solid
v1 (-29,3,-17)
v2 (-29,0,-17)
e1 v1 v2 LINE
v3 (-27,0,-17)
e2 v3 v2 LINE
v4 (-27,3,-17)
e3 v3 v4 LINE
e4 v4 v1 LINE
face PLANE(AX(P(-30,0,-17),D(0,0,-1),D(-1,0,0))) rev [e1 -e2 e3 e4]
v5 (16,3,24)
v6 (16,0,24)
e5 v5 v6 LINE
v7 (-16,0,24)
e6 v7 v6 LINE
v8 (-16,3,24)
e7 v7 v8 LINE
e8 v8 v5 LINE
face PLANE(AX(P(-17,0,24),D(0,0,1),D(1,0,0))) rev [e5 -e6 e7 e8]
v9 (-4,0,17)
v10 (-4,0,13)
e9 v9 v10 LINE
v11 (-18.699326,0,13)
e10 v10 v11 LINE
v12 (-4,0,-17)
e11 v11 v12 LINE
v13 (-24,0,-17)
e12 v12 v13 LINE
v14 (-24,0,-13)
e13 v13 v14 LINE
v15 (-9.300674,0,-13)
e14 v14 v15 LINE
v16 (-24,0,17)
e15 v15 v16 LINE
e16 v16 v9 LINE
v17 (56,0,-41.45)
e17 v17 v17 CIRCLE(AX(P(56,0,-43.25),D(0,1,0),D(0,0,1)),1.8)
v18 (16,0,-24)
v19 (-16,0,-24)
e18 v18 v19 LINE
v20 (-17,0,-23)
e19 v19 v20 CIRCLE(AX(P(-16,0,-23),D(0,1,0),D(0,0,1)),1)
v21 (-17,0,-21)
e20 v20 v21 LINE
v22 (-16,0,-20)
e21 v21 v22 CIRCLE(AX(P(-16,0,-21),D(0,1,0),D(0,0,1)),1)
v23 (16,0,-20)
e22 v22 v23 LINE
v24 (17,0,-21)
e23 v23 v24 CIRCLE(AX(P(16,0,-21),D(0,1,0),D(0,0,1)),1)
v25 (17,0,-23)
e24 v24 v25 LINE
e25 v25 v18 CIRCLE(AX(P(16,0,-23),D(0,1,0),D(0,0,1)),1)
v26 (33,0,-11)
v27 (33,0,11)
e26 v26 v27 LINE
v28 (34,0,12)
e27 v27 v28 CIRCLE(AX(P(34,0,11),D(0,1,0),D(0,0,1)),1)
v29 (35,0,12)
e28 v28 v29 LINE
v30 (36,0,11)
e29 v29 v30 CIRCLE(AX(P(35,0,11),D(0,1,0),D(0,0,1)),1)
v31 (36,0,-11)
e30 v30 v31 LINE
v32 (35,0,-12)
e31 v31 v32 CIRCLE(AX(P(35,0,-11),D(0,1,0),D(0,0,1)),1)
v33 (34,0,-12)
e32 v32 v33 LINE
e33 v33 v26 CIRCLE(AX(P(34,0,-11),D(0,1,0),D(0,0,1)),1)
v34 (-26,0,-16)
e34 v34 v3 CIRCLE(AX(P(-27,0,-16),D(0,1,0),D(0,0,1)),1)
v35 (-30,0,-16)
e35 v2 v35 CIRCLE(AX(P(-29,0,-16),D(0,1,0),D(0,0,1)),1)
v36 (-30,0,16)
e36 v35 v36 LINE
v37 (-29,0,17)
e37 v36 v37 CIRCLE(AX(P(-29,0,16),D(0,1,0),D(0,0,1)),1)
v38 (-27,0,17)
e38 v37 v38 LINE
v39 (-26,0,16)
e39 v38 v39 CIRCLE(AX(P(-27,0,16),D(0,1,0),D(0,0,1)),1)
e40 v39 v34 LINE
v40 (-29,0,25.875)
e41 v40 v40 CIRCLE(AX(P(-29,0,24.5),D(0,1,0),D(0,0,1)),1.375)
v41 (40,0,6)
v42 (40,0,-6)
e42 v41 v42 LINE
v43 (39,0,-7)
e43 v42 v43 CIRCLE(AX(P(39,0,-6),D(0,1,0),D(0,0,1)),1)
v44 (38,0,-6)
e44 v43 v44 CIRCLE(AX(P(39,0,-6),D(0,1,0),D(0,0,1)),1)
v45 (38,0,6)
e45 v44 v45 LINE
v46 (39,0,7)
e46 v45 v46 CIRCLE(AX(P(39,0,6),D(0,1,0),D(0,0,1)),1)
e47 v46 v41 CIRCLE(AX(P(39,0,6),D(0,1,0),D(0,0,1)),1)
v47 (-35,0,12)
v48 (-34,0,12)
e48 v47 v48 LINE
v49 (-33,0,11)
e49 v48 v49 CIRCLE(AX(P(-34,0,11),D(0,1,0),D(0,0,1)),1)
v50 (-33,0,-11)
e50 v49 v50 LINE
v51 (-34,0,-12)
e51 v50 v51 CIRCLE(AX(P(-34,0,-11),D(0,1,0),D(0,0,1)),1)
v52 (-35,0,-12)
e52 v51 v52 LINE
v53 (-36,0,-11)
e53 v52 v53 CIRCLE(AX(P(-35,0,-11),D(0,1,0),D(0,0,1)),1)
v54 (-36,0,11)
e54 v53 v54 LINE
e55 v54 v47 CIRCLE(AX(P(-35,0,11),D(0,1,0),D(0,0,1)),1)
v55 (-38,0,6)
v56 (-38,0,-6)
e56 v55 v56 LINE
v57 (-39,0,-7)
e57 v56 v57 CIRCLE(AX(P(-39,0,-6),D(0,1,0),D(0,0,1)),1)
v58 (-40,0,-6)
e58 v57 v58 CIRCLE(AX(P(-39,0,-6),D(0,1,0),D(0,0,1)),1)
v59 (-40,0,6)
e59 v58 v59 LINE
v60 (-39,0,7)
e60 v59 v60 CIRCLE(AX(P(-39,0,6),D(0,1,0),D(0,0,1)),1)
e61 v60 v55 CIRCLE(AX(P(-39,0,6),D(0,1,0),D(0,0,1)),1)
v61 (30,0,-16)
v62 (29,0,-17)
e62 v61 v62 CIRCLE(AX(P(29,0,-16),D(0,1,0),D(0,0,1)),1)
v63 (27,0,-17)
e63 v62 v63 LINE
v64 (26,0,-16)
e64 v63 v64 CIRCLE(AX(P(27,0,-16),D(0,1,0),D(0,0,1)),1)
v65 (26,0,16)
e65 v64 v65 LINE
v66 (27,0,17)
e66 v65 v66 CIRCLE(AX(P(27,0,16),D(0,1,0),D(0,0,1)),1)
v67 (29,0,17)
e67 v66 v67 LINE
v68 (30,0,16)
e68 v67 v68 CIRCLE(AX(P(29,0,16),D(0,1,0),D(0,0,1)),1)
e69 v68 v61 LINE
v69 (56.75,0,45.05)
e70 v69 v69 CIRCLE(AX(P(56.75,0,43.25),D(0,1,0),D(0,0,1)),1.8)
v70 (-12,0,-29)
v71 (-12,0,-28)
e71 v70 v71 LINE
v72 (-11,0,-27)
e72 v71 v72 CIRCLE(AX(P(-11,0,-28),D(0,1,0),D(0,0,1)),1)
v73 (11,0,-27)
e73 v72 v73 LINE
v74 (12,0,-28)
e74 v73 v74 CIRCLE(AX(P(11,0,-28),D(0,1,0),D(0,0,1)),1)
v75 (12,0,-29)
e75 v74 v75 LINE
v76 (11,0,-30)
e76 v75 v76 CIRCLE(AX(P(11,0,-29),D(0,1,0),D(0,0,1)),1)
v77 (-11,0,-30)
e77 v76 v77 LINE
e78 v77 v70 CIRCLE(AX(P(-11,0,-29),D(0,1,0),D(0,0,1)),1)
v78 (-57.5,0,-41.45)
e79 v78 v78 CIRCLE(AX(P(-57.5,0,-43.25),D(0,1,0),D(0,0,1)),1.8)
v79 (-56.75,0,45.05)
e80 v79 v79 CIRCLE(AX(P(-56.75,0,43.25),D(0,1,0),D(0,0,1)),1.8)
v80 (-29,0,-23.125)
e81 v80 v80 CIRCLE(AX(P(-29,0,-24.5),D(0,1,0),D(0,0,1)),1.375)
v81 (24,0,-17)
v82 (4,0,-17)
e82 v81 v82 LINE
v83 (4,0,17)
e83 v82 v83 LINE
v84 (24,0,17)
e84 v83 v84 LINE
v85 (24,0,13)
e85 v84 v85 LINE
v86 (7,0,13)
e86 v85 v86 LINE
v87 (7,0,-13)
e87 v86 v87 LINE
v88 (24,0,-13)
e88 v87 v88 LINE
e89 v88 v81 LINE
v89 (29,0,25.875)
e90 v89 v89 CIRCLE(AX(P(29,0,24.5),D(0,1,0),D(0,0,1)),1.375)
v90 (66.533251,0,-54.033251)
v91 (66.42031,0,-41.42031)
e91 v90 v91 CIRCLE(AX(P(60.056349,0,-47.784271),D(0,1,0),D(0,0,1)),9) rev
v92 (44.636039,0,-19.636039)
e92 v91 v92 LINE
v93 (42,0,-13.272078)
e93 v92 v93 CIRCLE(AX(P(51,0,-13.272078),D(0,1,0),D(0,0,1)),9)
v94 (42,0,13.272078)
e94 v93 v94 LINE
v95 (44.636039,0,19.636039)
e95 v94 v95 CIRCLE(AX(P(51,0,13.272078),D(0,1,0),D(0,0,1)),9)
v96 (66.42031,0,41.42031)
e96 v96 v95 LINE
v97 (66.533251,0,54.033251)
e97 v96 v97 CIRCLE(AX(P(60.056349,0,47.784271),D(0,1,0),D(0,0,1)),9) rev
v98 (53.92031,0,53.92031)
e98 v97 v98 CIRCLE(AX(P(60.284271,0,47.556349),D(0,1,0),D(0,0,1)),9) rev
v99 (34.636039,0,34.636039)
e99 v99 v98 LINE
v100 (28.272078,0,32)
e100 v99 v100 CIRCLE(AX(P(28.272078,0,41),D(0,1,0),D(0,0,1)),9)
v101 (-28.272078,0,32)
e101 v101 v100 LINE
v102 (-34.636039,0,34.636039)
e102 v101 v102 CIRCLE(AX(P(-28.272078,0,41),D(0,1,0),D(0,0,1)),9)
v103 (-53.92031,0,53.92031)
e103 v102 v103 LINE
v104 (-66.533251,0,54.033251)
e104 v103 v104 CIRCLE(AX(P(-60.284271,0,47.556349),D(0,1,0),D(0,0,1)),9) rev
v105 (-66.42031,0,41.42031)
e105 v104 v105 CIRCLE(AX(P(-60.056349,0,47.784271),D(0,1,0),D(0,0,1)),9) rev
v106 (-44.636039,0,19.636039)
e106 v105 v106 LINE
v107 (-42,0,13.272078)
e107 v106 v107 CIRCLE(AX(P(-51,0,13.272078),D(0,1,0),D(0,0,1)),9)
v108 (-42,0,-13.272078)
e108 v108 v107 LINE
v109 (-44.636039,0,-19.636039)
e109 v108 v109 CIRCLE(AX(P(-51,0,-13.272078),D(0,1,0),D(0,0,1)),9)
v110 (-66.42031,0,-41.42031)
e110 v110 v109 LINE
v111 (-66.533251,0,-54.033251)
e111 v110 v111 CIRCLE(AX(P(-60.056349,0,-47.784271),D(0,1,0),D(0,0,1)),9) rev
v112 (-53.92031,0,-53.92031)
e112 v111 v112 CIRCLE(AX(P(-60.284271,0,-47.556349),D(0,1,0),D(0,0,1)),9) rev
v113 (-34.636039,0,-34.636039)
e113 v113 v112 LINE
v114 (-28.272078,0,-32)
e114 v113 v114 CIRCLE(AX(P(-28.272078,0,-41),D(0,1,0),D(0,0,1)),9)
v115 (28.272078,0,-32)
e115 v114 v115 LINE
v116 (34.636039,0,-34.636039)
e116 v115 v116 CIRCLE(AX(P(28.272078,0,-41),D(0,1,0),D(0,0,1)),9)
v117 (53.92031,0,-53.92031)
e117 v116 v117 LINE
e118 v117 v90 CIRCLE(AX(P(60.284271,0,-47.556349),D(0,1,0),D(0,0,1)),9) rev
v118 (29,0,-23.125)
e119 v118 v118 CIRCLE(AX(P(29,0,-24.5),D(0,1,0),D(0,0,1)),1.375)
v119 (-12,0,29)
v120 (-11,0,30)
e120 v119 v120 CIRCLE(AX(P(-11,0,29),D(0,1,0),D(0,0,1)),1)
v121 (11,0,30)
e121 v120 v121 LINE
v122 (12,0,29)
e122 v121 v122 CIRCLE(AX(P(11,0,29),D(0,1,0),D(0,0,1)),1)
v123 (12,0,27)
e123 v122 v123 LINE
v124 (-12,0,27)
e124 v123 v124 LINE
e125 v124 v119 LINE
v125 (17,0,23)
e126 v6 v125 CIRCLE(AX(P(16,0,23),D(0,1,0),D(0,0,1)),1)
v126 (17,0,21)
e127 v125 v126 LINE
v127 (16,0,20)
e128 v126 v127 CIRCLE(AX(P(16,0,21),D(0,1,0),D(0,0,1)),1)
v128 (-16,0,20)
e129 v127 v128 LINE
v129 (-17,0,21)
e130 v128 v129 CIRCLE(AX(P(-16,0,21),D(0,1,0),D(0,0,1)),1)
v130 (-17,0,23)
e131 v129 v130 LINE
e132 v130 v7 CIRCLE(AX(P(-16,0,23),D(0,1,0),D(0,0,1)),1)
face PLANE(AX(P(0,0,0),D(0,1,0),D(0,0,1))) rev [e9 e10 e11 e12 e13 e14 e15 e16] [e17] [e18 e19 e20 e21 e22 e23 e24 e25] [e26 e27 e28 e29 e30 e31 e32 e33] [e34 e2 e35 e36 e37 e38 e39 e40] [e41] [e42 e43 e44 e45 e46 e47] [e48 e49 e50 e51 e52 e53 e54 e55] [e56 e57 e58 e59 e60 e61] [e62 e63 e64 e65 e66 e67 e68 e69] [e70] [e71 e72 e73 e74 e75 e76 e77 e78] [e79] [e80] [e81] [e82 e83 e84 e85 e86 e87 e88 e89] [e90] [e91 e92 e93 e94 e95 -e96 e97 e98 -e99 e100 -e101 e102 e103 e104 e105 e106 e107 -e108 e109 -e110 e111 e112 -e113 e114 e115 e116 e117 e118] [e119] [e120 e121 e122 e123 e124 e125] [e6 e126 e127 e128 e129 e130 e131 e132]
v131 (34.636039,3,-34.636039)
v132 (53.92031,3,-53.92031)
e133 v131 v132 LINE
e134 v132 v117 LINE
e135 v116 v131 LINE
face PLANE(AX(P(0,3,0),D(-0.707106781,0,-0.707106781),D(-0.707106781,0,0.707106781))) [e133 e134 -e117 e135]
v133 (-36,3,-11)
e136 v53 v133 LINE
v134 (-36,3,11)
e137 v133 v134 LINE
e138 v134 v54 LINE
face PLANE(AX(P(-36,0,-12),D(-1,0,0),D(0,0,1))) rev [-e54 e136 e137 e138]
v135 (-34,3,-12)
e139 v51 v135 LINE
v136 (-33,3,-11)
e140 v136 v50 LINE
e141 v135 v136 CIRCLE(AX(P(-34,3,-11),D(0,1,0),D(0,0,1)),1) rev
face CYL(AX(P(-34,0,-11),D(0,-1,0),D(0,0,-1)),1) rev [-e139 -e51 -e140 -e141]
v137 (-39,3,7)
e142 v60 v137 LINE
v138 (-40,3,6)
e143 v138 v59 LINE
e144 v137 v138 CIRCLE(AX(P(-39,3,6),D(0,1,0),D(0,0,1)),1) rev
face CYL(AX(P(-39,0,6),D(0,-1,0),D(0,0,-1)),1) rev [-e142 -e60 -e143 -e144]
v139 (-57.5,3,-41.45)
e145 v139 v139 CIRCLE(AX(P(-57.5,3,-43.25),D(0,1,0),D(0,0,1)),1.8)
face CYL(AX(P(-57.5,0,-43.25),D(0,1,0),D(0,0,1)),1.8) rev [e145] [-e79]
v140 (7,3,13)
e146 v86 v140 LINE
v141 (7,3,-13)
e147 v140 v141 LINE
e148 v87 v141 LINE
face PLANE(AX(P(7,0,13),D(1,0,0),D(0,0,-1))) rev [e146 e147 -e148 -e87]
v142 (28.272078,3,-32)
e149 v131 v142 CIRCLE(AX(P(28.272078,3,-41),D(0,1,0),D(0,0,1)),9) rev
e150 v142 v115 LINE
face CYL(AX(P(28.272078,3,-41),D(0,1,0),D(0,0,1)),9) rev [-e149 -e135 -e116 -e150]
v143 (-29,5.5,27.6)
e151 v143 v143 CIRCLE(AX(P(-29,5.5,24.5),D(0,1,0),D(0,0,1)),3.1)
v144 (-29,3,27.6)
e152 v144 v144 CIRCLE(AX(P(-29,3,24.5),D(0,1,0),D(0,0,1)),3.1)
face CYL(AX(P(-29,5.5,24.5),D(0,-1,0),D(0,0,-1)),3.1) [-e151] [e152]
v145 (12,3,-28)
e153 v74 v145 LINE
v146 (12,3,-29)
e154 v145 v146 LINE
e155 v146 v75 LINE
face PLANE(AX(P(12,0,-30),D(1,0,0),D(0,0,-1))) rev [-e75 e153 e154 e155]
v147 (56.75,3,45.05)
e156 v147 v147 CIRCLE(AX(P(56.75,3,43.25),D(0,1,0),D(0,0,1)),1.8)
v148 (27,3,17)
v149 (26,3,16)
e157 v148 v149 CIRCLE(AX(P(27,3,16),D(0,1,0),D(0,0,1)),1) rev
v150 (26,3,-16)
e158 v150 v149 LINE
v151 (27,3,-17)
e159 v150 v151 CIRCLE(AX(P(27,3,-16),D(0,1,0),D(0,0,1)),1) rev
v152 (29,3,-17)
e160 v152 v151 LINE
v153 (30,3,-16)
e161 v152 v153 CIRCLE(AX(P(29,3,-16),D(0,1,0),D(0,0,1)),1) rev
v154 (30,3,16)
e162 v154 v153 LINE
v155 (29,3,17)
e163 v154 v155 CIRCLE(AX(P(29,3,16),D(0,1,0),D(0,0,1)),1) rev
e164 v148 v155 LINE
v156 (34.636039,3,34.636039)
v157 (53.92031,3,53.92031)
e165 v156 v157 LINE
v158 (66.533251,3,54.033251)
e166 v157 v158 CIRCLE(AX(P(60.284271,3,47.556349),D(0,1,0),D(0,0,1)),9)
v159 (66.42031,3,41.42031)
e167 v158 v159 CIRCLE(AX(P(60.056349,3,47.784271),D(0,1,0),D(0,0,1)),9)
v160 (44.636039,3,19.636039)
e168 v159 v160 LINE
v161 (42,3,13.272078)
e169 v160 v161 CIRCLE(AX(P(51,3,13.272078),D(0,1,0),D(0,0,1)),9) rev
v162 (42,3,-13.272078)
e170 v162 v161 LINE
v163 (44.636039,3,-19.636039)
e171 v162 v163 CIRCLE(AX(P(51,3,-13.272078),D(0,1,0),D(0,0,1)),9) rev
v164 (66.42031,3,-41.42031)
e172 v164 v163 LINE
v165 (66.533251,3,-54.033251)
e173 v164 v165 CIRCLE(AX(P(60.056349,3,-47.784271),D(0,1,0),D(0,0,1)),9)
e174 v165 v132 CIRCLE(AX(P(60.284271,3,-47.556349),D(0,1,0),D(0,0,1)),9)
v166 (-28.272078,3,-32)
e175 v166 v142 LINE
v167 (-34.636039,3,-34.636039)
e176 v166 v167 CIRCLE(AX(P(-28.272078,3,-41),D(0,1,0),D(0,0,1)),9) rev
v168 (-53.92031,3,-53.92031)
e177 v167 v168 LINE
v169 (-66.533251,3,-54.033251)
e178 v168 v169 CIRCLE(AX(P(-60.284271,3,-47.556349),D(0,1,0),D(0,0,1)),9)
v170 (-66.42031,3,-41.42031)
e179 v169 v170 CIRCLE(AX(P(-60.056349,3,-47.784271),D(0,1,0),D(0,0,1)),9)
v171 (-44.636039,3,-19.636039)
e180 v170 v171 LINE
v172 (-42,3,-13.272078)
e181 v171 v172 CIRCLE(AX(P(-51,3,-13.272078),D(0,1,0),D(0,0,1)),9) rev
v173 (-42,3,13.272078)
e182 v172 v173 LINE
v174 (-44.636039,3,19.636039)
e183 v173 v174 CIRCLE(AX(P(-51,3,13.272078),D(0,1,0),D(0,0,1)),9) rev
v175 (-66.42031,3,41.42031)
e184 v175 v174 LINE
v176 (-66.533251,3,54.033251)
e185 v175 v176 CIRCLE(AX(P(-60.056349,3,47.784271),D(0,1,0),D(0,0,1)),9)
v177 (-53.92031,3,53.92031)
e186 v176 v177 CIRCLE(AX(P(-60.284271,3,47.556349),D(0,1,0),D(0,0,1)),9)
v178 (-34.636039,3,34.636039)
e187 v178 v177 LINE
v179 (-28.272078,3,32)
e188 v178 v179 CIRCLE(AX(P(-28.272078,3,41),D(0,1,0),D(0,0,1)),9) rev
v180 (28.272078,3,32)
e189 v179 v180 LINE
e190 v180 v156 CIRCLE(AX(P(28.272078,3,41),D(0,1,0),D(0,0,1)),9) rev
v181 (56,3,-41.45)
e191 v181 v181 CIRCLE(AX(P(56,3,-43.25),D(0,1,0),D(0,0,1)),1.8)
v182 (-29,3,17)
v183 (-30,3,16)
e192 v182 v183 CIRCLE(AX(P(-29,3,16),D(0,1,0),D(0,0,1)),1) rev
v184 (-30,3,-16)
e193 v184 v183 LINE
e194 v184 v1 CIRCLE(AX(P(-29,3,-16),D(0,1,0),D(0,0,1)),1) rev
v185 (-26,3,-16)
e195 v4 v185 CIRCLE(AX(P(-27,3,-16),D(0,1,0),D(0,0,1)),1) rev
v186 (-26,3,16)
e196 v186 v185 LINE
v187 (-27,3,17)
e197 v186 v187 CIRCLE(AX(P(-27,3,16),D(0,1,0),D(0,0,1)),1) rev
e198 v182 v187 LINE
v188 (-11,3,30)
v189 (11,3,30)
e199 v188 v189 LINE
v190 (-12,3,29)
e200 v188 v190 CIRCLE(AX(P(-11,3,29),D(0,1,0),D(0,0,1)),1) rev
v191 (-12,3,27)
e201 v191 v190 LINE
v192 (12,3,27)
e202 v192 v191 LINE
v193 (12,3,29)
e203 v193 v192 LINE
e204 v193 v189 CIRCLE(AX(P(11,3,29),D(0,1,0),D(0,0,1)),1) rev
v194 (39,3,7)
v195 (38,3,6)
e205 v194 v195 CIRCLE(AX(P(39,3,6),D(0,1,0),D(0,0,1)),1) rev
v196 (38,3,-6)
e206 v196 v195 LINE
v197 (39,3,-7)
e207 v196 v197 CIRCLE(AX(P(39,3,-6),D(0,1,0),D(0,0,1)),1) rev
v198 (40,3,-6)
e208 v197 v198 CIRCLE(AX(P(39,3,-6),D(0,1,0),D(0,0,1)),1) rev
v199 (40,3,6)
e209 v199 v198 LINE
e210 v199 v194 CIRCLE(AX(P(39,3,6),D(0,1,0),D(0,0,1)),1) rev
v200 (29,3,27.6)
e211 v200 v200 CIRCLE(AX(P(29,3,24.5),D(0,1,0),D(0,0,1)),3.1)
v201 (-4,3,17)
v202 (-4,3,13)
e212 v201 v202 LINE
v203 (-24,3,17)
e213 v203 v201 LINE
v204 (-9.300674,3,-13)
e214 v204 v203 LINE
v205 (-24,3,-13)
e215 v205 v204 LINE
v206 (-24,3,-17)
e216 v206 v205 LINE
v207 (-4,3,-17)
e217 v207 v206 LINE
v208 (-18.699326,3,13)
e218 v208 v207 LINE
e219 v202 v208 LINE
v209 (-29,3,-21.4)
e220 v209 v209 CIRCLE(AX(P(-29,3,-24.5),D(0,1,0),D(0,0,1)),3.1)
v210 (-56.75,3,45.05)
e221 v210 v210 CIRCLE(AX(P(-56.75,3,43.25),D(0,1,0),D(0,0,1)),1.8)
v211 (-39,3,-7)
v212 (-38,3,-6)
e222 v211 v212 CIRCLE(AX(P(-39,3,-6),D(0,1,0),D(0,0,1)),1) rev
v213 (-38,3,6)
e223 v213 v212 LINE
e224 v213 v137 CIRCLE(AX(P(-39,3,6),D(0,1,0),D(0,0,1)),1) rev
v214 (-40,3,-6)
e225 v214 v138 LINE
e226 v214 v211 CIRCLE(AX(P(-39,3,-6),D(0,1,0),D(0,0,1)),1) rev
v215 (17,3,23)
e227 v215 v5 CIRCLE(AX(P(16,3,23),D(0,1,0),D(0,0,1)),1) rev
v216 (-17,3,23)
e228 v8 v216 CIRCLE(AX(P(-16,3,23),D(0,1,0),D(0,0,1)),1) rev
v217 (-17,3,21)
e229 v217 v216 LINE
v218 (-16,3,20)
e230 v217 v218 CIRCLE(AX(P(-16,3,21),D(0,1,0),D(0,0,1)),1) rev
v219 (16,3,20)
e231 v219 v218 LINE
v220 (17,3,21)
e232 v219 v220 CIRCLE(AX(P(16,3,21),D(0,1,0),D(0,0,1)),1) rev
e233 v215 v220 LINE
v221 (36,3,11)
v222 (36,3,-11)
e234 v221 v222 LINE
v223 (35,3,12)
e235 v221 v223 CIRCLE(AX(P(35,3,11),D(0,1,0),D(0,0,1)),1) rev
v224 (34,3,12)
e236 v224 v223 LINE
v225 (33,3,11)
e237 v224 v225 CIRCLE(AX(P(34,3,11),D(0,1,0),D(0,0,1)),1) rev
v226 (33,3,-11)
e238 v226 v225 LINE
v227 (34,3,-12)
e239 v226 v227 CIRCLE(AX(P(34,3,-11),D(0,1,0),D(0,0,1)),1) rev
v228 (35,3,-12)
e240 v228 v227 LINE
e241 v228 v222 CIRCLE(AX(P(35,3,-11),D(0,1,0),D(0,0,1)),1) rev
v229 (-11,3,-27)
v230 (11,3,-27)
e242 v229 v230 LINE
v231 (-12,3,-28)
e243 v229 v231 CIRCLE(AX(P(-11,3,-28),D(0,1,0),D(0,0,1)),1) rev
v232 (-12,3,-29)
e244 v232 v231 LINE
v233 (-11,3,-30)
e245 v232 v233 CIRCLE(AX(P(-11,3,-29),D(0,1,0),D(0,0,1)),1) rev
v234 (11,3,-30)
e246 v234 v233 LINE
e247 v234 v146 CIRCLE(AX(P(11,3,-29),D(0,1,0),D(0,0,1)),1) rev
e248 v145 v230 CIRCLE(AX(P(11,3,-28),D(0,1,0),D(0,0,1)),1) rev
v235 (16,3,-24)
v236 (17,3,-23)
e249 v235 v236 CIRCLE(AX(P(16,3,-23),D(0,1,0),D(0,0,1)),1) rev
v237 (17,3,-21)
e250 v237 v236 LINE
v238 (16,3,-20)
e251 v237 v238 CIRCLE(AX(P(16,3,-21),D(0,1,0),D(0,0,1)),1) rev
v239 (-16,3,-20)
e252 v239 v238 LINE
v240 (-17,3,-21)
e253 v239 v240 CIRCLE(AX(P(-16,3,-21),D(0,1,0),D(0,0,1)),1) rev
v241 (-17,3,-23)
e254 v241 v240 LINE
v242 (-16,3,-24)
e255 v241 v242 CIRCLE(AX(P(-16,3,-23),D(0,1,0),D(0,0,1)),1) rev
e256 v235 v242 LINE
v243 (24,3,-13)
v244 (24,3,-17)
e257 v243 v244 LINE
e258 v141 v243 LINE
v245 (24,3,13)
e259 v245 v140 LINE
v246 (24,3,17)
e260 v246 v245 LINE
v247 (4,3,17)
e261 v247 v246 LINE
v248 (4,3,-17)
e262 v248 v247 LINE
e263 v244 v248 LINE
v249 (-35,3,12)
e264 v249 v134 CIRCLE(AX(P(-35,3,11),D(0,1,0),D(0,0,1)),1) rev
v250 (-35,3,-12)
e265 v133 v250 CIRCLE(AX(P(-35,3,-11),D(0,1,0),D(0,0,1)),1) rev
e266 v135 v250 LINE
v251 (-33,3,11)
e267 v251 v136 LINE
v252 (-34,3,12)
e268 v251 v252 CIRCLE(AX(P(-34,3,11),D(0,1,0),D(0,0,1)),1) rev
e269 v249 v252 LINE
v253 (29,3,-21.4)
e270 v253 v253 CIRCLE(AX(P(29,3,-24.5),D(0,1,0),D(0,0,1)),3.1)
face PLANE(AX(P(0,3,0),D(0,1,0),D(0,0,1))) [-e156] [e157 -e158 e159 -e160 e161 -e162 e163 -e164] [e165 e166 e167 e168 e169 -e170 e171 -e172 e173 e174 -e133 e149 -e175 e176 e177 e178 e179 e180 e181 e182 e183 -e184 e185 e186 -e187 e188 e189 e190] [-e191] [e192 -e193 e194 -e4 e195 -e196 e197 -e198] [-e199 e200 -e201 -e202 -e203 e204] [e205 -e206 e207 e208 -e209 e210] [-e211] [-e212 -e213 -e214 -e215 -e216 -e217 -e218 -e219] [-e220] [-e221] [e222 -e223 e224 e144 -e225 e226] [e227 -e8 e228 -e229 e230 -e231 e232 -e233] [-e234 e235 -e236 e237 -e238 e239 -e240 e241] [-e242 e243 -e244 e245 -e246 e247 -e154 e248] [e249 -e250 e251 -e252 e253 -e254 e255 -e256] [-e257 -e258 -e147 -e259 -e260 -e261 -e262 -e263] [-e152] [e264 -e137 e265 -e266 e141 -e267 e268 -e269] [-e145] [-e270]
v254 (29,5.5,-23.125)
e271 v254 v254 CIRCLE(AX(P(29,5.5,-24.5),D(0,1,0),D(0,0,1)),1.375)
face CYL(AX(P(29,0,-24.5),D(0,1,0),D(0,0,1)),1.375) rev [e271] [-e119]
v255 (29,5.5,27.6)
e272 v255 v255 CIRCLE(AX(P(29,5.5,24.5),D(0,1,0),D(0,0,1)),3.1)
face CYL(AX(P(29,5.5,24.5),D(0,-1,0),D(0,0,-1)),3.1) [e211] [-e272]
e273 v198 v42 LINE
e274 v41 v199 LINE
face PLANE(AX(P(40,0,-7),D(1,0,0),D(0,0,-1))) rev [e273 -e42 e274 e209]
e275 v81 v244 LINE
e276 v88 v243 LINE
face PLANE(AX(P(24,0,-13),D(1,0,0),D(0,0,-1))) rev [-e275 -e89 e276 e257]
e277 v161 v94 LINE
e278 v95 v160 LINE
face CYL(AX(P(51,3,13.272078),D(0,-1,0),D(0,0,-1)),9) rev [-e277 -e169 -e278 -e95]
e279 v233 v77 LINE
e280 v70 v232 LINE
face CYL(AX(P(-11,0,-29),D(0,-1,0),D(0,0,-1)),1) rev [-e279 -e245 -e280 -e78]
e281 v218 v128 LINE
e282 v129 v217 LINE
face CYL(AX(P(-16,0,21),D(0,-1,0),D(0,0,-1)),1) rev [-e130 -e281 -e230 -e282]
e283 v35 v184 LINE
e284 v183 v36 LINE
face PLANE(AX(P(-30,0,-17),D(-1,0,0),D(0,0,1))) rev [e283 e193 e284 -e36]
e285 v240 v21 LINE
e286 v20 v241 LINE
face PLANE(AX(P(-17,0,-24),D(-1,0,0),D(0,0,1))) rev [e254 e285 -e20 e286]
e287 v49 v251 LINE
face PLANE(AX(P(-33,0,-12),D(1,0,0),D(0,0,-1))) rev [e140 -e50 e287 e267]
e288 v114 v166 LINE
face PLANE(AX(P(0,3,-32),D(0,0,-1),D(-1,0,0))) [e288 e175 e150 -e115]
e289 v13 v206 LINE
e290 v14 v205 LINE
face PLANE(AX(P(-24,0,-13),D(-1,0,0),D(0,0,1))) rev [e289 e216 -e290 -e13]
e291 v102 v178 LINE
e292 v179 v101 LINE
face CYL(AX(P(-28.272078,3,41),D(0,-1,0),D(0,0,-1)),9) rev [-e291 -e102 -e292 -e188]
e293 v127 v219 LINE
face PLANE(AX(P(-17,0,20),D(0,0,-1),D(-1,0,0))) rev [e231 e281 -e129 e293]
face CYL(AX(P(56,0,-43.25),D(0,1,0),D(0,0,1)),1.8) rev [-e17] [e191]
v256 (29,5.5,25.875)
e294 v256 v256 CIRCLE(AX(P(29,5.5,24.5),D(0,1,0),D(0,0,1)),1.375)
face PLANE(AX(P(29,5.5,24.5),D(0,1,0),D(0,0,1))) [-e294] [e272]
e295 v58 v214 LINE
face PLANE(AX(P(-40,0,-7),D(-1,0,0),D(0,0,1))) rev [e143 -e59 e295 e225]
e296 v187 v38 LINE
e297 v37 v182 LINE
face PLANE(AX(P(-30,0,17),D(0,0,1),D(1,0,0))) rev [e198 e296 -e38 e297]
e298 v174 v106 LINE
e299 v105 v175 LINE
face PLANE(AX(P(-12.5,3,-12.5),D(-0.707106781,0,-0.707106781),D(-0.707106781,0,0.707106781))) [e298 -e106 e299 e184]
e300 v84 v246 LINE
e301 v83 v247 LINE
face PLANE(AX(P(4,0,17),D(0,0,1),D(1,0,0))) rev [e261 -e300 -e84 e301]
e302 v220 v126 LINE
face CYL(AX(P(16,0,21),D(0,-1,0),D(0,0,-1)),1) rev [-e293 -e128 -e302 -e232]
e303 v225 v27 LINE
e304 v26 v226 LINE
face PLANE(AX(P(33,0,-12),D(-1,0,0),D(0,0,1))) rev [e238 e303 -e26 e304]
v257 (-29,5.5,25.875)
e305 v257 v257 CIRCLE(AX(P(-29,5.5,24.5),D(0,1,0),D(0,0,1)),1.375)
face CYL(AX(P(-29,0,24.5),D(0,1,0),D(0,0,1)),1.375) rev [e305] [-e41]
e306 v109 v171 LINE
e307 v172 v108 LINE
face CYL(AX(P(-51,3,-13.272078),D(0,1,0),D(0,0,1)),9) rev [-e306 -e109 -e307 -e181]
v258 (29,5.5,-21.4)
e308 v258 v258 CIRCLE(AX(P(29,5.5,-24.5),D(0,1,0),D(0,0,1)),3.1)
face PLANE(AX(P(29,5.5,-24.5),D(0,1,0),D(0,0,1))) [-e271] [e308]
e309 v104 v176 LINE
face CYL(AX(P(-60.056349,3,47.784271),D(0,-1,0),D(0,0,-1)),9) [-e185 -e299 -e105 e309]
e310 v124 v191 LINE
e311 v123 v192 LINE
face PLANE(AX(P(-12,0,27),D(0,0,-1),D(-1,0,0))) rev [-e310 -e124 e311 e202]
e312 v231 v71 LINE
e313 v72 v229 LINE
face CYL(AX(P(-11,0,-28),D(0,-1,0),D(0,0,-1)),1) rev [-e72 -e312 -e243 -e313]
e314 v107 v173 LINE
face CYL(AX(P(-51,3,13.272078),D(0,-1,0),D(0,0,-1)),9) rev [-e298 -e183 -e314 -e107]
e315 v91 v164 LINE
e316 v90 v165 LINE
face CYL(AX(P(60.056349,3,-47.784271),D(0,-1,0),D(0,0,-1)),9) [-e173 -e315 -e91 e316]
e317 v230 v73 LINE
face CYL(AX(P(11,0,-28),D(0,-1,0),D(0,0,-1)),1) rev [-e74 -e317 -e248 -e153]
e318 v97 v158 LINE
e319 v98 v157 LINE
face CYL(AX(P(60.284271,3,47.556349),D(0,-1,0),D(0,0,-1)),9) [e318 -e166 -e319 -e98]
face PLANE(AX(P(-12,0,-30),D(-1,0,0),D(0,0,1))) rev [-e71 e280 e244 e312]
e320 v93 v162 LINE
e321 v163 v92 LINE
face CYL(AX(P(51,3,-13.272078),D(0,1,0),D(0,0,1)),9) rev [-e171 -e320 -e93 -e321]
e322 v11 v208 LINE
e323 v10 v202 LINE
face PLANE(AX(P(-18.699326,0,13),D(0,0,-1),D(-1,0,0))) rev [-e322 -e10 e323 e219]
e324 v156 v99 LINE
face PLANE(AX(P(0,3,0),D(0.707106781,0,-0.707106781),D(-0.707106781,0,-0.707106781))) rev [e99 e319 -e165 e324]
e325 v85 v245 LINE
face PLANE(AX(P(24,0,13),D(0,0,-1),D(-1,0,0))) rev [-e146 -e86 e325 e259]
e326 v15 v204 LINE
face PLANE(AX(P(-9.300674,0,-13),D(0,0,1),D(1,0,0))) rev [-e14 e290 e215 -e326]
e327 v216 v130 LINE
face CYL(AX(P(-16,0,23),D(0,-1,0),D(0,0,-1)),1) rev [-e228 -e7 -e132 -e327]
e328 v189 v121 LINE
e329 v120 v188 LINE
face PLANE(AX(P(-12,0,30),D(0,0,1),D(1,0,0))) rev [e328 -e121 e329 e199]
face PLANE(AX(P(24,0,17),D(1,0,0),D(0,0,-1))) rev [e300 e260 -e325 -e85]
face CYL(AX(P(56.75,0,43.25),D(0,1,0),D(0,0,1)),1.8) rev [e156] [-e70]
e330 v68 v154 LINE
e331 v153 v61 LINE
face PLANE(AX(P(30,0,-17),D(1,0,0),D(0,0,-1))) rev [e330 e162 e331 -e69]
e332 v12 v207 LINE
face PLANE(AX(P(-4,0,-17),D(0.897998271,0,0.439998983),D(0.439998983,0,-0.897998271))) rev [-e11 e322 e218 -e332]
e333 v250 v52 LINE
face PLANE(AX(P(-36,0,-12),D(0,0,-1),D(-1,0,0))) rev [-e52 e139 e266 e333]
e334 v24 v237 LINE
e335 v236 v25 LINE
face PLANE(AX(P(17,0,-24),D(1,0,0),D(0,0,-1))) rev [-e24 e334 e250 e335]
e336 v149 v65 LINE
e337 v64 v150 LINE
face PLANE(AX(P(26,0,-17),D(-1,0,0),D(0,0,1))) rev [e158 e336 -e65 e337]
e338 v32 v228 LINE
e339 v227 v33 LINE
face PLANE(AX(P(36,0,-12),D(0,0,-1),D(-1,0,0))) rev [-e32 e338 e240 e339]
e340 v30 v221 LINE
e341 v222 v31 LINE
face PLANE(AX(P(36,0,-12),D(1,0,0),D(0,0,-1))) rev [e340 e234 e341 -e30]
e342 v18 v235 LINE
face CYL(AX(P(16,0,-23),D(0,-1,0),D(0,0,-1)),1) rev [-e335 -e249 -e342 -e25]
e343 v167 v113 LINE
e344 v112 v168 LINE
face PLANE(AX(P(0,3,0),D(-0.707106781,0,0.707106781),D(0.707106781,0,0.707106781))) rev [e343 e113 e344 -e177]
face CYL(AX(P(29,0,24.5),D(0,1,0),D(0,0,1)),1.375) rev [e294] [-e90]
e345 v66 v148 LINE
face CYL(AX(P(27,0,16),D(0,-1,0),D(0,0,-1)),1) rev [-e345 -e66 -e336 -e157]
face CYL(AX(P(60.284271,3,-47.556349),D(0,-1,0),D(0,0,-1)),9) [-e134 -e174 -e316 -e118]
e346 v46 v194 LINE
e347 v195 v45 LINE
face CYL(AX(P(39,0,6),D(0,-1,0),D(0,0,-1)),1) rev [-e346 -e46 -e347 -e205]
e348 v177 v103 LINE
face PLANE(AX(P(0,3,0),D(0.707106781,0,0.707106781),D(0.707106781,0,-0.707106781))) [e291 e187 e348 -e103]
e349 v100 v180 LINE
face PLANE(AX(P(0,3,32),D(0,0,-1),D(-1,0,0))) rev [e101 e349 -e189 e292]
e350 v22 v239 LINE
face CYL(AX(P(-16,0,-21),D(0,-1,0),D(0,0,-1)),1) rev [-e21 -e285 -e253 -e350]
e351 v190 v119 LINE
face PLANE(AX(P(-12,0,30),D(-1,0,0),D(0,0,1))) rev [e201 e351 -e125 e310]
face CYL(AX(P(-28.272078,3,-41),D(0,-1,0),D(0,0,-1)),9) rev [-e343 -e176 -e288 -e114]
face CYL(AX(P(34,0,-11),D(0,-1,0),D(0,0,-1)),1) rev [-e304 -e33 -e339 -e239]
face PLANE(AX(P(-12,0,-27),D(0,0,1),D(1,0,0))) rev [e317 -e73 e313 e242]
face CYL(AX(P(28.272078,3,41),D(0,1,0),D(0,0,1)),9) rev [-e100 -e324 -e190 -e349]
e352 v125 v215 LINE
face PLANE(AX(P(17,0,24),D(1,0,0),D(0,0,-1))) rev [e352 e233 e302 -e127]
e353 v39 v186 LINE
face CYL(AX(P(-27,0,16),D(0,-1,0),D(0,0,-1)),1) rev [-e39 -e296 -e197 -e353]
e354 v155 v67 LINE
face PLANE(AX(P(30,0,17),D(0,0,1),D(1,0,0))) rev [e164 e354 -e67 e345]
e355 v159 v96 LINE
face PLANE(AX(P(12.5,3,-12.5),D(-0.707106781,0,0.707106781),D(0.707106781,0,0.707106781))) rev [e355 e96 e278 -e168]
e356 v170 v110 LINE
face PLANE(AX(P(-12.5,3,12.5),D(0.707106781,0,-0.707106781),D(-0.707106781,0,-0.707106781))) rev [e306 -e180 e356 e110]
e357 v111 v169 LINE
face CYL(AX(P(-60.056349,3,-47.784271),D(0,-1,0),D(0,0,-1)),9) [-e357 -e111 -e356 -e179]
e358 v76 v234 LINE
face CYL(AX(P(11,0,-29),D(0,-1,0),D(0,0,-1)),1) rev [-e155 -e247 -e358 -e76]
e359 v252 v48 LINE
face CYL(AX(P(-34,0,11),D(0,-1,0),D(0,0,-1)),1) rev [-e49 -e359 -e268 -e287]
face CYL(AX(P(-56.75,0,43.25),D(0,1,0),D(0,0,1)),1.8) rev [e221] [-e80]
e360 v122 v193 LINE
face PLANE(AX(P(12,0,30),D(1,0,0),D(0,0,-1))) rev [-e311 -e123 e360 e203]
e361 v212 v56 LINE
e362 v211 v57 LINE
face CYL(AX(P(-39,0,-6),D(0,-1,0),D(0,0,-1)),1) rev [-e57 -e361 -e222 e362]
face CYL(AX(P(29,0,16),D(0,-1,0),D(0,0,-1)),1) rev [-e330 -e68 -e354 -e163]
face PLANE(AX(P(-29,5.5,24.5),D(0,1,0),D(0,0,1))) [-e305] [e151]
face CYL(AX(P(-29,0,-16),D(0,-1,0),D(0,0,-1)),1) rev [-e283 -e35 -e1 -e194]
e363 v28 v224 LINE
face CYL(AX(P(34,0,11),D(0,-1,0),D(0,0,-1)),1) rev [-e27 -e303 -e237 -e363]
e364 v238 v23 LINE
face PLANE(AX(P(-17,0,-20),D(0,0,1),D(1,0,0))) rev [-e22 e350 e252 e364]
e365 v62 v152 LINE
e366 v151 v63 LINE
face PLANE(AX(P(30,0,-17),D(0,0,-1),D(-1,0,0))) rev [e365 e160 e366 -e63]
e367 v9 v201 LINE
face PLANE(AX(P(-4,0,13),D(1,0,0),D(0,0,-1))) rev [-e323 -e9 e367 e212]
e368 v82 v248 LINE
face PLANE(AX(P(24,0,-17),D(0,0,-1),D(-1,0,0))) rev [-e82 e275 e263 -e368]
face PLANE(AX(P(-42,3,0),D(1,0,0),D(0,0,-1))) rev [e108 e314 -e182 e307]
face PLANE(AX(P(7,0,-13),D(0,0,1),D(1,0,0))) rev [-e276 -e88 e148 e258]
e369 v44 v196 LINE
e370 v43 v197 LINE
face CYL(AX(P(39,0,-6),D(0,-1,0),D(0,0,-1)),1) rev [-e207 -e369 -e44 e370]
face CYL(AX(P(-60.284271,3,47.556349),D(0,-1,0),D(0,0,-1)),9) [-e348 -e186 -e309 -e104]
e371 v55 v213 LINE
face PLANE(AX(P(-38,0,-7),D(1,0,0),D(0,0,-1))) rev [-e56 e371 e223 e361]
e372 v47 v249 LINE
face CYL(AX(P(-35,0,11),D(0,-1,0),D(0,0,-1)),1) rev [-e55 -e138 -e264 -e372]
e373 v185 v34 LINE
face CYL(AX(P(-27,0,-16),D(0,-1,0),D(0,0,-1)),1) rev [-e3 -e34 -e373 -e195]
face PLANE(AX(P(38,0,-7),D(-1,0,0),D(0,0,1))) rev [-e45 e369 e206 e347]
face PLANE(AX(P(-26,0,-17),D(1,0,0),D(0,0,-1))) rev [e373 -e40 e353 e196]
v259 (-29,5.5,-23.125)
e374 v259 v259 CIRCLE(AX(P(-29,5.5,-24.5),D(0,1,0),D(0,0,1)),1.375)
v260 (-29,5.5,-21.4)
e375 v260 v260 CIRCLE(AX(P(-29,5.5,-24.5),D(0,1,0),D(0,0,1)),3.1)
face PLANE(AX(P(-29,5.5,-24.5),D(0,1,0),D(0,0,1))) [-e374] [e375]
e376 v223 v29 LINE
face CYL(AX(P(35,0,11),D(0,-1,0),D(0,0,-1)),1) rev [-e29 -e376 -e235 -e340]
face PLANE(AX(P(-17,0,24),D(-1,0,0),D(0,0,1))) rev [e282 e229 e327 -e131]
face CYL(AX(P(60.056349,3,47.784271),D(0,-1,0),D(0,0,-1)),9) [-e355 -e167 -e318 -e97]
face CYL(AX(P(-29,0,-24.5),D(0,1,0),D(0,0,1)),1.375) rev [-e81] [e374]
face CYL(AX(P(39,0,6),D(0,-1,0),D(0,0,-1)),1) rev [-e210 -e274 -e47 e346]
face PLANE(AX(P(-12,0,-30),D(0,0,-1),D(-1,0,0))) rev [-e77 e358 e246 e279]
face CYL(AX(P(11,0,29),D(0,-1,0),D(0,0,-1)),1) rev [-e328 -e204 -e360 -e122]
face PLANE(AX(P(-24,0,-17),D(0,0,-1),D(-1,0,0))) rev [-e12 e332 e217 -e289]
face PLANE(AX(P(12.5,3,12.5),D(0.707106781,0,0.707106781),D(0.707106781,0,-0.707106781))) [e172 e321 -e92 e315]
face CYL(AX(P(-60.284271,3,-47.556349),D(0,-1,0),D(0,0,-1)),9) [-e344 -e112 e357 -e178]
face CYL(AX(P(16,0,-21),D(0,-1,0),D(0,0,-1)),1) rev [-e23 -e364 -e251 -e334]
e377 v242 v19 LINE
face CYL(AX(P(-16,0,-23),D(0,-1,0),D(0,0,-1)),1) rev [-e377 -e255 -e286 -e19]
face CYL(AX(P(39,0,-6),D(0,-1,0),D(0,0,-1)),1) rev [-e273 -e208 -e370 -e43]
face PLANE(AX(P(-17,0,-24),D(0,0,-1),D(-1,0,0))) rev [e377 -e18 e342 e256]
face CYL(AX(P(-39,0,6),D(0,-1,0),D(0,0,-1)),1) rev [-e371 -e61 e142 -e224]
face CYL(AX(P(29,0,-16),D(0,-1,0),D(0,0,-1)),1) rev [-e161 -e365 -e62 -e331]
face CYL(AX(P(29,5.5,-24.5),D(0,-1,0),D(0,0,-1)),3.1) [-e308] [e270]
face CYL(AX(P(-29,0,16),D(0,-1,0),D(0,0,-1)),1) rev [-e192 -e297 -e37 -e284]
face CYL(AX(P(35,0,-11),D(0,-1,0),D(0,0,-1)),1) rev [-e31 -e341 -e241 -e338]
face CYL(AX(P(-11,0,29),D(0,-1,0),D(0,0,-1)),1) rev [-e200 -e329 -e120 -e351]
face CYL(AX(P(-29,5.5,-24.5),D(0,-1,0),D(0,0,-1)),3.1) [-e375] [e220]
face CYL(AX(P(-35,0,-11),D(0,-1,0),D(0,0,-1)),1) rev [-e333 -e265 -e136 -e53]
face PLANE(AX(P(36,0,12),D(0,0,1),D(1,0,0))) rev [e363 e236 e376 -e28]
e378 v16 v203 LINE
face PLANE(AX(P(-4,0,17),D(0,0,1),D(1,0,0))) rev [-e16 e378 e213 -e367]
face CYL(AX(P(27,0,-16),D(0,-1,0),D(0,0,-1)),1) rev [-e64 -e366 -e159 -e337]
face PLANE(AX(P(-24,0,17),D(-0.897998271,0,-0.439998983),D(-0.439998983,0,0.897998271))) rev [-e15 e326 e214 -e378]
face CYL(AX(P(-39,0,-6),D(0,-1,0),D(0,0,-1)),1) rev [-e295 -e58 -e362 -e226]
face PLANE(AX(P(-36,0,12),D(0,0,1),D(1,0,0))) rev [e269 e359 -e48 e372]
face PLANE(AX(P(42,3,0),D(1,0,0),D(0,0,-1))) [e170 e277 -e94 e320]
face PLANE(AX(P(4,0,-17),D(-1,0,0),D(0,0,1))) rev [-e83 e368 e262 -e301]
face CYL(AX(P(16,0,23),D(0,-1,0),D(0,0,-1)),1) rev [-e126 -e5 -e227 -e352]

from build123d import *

# Parameters (mm, degrees)
SKETCH2_W           = 84
SKETCH2_H           = 64
BOSS_EXTRUDE1_DEPTH = 3
SKETCH3_R           = 3.1
BOSS_EXTRUDE2_DEPTH = 2.5
SKETCH4_R           = 1.375
CUT_EXTRUDE1_DEPTH  = 95.667806042
SKETCH5_R           = 1.8
CUT_EXTRUDE2_DEPTH  = 95.555504868
FILLET1_R           = 9
FILLET2_R           = 9
CUT_EXTRUDE3_DEPTH  = 90.310693627
SKETCH7_W           = 2
SKETCH7_H           = 14
SKETCH7_W_2         = 3
SKETCH7_H_2         = 24
SKETCH7_W_3         = 4
SKETCH7_H_3         = 34
SKETCH7_W_4         = 24
SKETCH7_H_4         = 3
SKETCH7_W_5         = 34
SKETCH7_H_5         = 4
CUT_EXTRUDE4_DEPTH  = 90.310693627
FILLET3_R           = 1


# Some blends are built 0.0001 mm under size
with BuildPart() as part:
    # Sketch2 → Boss-Extrude1 (new body)
    with BuildSketch(Plane(origin=(0, 0, 0), x_dir=(1, 0, 0), z_dir=(0, 1, 0))):
        Rectangle(SKETCH2_W, SKETCH2_H)
        Polygon((-42, -32), (-42, -17), (-72.784271247, -47.784271247), (-60.284271247, -60.284271247), (-32, -32), align=None)
        Polygon((60.284271247, 60.284271247), (32, 32), (42, 32), (42, 17), (72.784271247, 47.784271247), align=None)
        Polygon((72.784271247, -47.784271247), (42, -17), (42, -32), (32, -32), (60.284271247, -60.284271247), align=None)
        Polygon((-42, 32), (-32, 32), (-60.284271247, 60.284271247), (-72.784271247, 47.784271247), (-42, 17), align=None)
    extrude(amount=BOSS_EXTRUDE1_DEPTH)

    # Sketch3 → Boss-Extrude2 (add)
    with BuildSketch(Plane(origin=(0, 3, 0), x_dir=(1, 0, 0), z_dir=(0, 1, 0))):
        with Locations(Location((-29, 24.5, 0), (0, 0, 270))):
            Circle(SKETCH3_R)
        with Locations(Location((-29, -24.5, 0), (0, 0, 270))):
            Circle(SKETCH3_R)
        with Locations(Location((29, -24.5, 0), (0, 0, 270))):
            Circle(SKETCH3_R)
        with Locations(Location((29, 24.5, 0), (0, 0, 270))):
            Circle(SKETCH3_R)
    extrude(amount=BOSS_EXTRUDE2_DEPTH)

    # Sketch4 → Cut-Extrude1 (cut, through all)
    with BuildSketch(Plane(origin=(0, 5.5, 0), x_dir=(1, 0, 0), z_dir=(0, 1, 0))):
        with Locations(Location((-29, 24.5, 0), (0, 0, 270))):
            Circle(SKETCH4_R)
        with Locations(Location((-29, -24.5, 0), (0, 0, 270))):
            Circle(SKETCH4_R)
        with Locations(Location((29, -24.5, 0), (0, 0, 270))):
            Circle(SKETCH4_R)
        with Locations(Location((29, 24.5, 0), (0, 0, 270))):
            Circle(SKETCH4_R)
    extrude(amount=-CUT_EXTRUDE1_DEPTH, mode=Mode.SUBTRACT)

    # Sketch5 → Cut-Extrude2 (cut, through all)
    with BuildSketch(Plane(origin=(0, 3, 0), x_dir=(1, 0, 0), z_dir=(0, 1, 0))):
        with Locations(Location((-57.5, 43.25, 0), (0, 0, 270))):
            Circle(SKETCH5_R)
        with Locations(Location((56, 43.25, 0), (0, 0, 270))):
            Circle(SKETCH5_R)
        with Locations(Location((56.75, -43.25, 0), (0, 0, 270))):
            Circle(SKETCH5_R)
        with Locations(Location((-56.75, -43.25, 0), (0, 0, 270))):
            Circle(SKETCH5_R)
    extrude(amount=-CUT_EXTRUDE2_DEPTH, mode=Mode.SUBTRACT)

    # Fillet1
    # the kernel refuses this fillet: 9 mm, written as the material it takes off along each edge
    with BuildSketch(Plane(origin=(-72.784271247, -22.5, 47.784271247), x_dir=(0.7071067811865487, 0, 0.7071067811865464), z_dir=(0, 1, 0)), Plane(origin=(-60.284271247, -22.5, 60.284271247), x_dir=(0.7071067811865467, 0, -0.7071067811865483), z_dir=(0, 1, 0)), Plane(origin=(60.284271247, -22.5, 60.284271247), x_dir=(0.7071067811865482, 0, -0.7071067811865467), z_dir=(0, 1, 0)), Plane(origin=(72.784271247, -22.5, 47.784271247), x_dir=(-0.7071067811865468, 0, -0.7071067811865483), z_dir=(0, 1, 0))) as fillet1_piece_1:
        with BuildLine():
            CenterArc((FILLET1_R, FILLET1_R), FILLET1_R, 180, 90)
            Line((0, FILLET1_R), (0, 0))
            Line((0, 0), (FILLET1_R, 0))
        make_face()
    extrude(amount=48, mode=Mode.SUBTRACT)
    with BuildSketch(Plane(origin=(72.784271247, -22.5, -47.784271247), x_dir=(-0.7071067811865472, 0, 0.707106781186548), z_dir=(0, 1, 0)), Plane(origin=(60.284271247, -22.5, -60.284271247), x_dir=(0.7071067811865487, 0, 0.7071067811865464), z_dir=(0, 1, 0)), Plane(origin=(-60.284271247, -22.5, -60.284271247), x_dir=(0.7071067811865467, 0, 0.7071067811865482), z_dir=(0, 1, 0)), Plane(origin=(-72.784271247, -22.5, -47.784271247), x_dir=(0.7071067811865491, 0, -0.7071067811865459), z_dir=(0, 1, 0))) as fillet1_piece_2:
        with BuildLine():
            CenterArc((FILLET1_R, -FILLET1_R), FILLET1_R, 90, 90)
            Line((0, -FILLET1_R), (0, 0))
            Line((0, 0), (FILLET1_R, 0))
        make_face()
    extrude(amount=48, mode=Mode.SUBTRACT)

    # Fillet2
    fillet2_edges = [part.edges().sort_by_distance(p)[0] for p in [
        (42, 1.5, 17),
        (32, 1.5, 32),
        (-32, 1.5, 32),
        (-42, 1.5, 17),
        (-42, 1.5, -17),
        (-32, 1.5, -32),
        (32, 1.5, -32),
        (42, 1.5, -17),
    ]]
    fillet(fillet2_edges, radius=FILLET2_R)

    # Sketch6 → Cut-Extrude3 (cut, through all)
    with BuildSketch(Plane(origin=(0, 3, 0), x_dir=(1, 0, 0), z_dir=(0, 1, 0))):
        Polygon((-24, 17), (-4, 17), (-18.699326173, -13), (-4, -13), (-4, -17), (-24, -17), (-9.300673827, 13), (-24, 13), align=None)
        Polygon((7, 13), (24, 13), (24, 17), (4, 17), (4, -17), (24, -17), (24, -13), (7, -13), align=None)
    extrude(amount=-CUT_EXTRUDE3_DEPTH, mode=Mode.SUBTRACT)

    # Sketch7 → Cut-Extrude4 (cut, through all)
    with BuildSketch(Plane(origin=(0, 3, 0), x_dir=(1, 0, 0), z_dir=(0, 1, 0))):
        with Locations((-39, 0)):
            Rectangle(SKETCH7_W, SKETCH7_H)
        with Locations((-34.5, 0)):
            Rectangle(SKETCH7_W_2, SKETCH7_H_2)
        with Locations((-28, 0)):
            Rectangle(SKETCH7_W_3, SKETCH7_H_3)
        with Locations((0, 28.5)):
            Rectangle(SKETCH7_W_4, SKETCH7_H_4)
        with Locations((0, 22)):
            Rectangle(SKETCH7_W_5, SKETCH7_H_5)
        with Locations((0, -22)):
            Rectangle(SKETCH7_W_5, SKETCH7_H_5)
        with Locations((0, -28.5)):
            Rectangle(SKETCH7_W_4, SKETCH7_H_4)
        with Locations((28, 0)):
            Rectangle(SKETCH7_W_3, SKETCH7_H_3)
        with Locations((34.5, 0)):
            Rectangle(SKETCH7_W_2, SKETCH7_H_2)
        with Locations((39, 0)):
            Rectangle(SKETCH7_W, SKETCH7_H)
    extrude(amount=-CUT_EXTRUDE4_DEPTH, mode=Mode.SUBTRACT)

    # Fillet3
    fillet3_edges = [part.edges().sort_by_distance(p)[0] for p in [
        (-12, 1.5, -27),
        (12, 1.5, -27),
        (17, 1.5, -20),
        (-17, 1.5, -20),
        (-17, 1.5, -24),
        (17, 1.5, -24),
        (12, 1.5, -30),
        (-12, 1.5, -30),
        (-17, 1.5, 20),
        (17, 1.5, 20),
        (17, 1.5, 24),
        (12, 1.5, 30),
        (-12, 1.5, 30),
        (-17, 1.5, 24),
        (30, 1.5, 17),
        (36, 1.5, 12),
        (40, 1.5, 7),
        (38, 1.5, 7),
        (33, 1.5, 12),
        (26, 1.5, 17),
        (26, 1.5, -17),
        (33, 1.5, -12),
        (38, 1.5, -7),
        (30, 1.5, -17),
        (36, 1.5, -12),
        (40, 1.5, -7),
        (-30, 1.5, 17),
        (-26, 1.5, 17),
        (-30, 1.5, -17),
        (-26, 1.5, -17),
        (-33, 1.5, -12),
        (-36, 1.5, -12),
        (-33, 1.5, 12),
        (-36, 1.5, 12),
        (-38, 1.5, 7),
        (-40, 1.5, 7),
        (-38, 1.5, -7),
        (-40, 1.5, -7),
    ]]
    fillet(fillet3_edges, radius=FILLET3_R - 0.0001)  # a hair under: the kernel refuses the full size


solid = part.part
